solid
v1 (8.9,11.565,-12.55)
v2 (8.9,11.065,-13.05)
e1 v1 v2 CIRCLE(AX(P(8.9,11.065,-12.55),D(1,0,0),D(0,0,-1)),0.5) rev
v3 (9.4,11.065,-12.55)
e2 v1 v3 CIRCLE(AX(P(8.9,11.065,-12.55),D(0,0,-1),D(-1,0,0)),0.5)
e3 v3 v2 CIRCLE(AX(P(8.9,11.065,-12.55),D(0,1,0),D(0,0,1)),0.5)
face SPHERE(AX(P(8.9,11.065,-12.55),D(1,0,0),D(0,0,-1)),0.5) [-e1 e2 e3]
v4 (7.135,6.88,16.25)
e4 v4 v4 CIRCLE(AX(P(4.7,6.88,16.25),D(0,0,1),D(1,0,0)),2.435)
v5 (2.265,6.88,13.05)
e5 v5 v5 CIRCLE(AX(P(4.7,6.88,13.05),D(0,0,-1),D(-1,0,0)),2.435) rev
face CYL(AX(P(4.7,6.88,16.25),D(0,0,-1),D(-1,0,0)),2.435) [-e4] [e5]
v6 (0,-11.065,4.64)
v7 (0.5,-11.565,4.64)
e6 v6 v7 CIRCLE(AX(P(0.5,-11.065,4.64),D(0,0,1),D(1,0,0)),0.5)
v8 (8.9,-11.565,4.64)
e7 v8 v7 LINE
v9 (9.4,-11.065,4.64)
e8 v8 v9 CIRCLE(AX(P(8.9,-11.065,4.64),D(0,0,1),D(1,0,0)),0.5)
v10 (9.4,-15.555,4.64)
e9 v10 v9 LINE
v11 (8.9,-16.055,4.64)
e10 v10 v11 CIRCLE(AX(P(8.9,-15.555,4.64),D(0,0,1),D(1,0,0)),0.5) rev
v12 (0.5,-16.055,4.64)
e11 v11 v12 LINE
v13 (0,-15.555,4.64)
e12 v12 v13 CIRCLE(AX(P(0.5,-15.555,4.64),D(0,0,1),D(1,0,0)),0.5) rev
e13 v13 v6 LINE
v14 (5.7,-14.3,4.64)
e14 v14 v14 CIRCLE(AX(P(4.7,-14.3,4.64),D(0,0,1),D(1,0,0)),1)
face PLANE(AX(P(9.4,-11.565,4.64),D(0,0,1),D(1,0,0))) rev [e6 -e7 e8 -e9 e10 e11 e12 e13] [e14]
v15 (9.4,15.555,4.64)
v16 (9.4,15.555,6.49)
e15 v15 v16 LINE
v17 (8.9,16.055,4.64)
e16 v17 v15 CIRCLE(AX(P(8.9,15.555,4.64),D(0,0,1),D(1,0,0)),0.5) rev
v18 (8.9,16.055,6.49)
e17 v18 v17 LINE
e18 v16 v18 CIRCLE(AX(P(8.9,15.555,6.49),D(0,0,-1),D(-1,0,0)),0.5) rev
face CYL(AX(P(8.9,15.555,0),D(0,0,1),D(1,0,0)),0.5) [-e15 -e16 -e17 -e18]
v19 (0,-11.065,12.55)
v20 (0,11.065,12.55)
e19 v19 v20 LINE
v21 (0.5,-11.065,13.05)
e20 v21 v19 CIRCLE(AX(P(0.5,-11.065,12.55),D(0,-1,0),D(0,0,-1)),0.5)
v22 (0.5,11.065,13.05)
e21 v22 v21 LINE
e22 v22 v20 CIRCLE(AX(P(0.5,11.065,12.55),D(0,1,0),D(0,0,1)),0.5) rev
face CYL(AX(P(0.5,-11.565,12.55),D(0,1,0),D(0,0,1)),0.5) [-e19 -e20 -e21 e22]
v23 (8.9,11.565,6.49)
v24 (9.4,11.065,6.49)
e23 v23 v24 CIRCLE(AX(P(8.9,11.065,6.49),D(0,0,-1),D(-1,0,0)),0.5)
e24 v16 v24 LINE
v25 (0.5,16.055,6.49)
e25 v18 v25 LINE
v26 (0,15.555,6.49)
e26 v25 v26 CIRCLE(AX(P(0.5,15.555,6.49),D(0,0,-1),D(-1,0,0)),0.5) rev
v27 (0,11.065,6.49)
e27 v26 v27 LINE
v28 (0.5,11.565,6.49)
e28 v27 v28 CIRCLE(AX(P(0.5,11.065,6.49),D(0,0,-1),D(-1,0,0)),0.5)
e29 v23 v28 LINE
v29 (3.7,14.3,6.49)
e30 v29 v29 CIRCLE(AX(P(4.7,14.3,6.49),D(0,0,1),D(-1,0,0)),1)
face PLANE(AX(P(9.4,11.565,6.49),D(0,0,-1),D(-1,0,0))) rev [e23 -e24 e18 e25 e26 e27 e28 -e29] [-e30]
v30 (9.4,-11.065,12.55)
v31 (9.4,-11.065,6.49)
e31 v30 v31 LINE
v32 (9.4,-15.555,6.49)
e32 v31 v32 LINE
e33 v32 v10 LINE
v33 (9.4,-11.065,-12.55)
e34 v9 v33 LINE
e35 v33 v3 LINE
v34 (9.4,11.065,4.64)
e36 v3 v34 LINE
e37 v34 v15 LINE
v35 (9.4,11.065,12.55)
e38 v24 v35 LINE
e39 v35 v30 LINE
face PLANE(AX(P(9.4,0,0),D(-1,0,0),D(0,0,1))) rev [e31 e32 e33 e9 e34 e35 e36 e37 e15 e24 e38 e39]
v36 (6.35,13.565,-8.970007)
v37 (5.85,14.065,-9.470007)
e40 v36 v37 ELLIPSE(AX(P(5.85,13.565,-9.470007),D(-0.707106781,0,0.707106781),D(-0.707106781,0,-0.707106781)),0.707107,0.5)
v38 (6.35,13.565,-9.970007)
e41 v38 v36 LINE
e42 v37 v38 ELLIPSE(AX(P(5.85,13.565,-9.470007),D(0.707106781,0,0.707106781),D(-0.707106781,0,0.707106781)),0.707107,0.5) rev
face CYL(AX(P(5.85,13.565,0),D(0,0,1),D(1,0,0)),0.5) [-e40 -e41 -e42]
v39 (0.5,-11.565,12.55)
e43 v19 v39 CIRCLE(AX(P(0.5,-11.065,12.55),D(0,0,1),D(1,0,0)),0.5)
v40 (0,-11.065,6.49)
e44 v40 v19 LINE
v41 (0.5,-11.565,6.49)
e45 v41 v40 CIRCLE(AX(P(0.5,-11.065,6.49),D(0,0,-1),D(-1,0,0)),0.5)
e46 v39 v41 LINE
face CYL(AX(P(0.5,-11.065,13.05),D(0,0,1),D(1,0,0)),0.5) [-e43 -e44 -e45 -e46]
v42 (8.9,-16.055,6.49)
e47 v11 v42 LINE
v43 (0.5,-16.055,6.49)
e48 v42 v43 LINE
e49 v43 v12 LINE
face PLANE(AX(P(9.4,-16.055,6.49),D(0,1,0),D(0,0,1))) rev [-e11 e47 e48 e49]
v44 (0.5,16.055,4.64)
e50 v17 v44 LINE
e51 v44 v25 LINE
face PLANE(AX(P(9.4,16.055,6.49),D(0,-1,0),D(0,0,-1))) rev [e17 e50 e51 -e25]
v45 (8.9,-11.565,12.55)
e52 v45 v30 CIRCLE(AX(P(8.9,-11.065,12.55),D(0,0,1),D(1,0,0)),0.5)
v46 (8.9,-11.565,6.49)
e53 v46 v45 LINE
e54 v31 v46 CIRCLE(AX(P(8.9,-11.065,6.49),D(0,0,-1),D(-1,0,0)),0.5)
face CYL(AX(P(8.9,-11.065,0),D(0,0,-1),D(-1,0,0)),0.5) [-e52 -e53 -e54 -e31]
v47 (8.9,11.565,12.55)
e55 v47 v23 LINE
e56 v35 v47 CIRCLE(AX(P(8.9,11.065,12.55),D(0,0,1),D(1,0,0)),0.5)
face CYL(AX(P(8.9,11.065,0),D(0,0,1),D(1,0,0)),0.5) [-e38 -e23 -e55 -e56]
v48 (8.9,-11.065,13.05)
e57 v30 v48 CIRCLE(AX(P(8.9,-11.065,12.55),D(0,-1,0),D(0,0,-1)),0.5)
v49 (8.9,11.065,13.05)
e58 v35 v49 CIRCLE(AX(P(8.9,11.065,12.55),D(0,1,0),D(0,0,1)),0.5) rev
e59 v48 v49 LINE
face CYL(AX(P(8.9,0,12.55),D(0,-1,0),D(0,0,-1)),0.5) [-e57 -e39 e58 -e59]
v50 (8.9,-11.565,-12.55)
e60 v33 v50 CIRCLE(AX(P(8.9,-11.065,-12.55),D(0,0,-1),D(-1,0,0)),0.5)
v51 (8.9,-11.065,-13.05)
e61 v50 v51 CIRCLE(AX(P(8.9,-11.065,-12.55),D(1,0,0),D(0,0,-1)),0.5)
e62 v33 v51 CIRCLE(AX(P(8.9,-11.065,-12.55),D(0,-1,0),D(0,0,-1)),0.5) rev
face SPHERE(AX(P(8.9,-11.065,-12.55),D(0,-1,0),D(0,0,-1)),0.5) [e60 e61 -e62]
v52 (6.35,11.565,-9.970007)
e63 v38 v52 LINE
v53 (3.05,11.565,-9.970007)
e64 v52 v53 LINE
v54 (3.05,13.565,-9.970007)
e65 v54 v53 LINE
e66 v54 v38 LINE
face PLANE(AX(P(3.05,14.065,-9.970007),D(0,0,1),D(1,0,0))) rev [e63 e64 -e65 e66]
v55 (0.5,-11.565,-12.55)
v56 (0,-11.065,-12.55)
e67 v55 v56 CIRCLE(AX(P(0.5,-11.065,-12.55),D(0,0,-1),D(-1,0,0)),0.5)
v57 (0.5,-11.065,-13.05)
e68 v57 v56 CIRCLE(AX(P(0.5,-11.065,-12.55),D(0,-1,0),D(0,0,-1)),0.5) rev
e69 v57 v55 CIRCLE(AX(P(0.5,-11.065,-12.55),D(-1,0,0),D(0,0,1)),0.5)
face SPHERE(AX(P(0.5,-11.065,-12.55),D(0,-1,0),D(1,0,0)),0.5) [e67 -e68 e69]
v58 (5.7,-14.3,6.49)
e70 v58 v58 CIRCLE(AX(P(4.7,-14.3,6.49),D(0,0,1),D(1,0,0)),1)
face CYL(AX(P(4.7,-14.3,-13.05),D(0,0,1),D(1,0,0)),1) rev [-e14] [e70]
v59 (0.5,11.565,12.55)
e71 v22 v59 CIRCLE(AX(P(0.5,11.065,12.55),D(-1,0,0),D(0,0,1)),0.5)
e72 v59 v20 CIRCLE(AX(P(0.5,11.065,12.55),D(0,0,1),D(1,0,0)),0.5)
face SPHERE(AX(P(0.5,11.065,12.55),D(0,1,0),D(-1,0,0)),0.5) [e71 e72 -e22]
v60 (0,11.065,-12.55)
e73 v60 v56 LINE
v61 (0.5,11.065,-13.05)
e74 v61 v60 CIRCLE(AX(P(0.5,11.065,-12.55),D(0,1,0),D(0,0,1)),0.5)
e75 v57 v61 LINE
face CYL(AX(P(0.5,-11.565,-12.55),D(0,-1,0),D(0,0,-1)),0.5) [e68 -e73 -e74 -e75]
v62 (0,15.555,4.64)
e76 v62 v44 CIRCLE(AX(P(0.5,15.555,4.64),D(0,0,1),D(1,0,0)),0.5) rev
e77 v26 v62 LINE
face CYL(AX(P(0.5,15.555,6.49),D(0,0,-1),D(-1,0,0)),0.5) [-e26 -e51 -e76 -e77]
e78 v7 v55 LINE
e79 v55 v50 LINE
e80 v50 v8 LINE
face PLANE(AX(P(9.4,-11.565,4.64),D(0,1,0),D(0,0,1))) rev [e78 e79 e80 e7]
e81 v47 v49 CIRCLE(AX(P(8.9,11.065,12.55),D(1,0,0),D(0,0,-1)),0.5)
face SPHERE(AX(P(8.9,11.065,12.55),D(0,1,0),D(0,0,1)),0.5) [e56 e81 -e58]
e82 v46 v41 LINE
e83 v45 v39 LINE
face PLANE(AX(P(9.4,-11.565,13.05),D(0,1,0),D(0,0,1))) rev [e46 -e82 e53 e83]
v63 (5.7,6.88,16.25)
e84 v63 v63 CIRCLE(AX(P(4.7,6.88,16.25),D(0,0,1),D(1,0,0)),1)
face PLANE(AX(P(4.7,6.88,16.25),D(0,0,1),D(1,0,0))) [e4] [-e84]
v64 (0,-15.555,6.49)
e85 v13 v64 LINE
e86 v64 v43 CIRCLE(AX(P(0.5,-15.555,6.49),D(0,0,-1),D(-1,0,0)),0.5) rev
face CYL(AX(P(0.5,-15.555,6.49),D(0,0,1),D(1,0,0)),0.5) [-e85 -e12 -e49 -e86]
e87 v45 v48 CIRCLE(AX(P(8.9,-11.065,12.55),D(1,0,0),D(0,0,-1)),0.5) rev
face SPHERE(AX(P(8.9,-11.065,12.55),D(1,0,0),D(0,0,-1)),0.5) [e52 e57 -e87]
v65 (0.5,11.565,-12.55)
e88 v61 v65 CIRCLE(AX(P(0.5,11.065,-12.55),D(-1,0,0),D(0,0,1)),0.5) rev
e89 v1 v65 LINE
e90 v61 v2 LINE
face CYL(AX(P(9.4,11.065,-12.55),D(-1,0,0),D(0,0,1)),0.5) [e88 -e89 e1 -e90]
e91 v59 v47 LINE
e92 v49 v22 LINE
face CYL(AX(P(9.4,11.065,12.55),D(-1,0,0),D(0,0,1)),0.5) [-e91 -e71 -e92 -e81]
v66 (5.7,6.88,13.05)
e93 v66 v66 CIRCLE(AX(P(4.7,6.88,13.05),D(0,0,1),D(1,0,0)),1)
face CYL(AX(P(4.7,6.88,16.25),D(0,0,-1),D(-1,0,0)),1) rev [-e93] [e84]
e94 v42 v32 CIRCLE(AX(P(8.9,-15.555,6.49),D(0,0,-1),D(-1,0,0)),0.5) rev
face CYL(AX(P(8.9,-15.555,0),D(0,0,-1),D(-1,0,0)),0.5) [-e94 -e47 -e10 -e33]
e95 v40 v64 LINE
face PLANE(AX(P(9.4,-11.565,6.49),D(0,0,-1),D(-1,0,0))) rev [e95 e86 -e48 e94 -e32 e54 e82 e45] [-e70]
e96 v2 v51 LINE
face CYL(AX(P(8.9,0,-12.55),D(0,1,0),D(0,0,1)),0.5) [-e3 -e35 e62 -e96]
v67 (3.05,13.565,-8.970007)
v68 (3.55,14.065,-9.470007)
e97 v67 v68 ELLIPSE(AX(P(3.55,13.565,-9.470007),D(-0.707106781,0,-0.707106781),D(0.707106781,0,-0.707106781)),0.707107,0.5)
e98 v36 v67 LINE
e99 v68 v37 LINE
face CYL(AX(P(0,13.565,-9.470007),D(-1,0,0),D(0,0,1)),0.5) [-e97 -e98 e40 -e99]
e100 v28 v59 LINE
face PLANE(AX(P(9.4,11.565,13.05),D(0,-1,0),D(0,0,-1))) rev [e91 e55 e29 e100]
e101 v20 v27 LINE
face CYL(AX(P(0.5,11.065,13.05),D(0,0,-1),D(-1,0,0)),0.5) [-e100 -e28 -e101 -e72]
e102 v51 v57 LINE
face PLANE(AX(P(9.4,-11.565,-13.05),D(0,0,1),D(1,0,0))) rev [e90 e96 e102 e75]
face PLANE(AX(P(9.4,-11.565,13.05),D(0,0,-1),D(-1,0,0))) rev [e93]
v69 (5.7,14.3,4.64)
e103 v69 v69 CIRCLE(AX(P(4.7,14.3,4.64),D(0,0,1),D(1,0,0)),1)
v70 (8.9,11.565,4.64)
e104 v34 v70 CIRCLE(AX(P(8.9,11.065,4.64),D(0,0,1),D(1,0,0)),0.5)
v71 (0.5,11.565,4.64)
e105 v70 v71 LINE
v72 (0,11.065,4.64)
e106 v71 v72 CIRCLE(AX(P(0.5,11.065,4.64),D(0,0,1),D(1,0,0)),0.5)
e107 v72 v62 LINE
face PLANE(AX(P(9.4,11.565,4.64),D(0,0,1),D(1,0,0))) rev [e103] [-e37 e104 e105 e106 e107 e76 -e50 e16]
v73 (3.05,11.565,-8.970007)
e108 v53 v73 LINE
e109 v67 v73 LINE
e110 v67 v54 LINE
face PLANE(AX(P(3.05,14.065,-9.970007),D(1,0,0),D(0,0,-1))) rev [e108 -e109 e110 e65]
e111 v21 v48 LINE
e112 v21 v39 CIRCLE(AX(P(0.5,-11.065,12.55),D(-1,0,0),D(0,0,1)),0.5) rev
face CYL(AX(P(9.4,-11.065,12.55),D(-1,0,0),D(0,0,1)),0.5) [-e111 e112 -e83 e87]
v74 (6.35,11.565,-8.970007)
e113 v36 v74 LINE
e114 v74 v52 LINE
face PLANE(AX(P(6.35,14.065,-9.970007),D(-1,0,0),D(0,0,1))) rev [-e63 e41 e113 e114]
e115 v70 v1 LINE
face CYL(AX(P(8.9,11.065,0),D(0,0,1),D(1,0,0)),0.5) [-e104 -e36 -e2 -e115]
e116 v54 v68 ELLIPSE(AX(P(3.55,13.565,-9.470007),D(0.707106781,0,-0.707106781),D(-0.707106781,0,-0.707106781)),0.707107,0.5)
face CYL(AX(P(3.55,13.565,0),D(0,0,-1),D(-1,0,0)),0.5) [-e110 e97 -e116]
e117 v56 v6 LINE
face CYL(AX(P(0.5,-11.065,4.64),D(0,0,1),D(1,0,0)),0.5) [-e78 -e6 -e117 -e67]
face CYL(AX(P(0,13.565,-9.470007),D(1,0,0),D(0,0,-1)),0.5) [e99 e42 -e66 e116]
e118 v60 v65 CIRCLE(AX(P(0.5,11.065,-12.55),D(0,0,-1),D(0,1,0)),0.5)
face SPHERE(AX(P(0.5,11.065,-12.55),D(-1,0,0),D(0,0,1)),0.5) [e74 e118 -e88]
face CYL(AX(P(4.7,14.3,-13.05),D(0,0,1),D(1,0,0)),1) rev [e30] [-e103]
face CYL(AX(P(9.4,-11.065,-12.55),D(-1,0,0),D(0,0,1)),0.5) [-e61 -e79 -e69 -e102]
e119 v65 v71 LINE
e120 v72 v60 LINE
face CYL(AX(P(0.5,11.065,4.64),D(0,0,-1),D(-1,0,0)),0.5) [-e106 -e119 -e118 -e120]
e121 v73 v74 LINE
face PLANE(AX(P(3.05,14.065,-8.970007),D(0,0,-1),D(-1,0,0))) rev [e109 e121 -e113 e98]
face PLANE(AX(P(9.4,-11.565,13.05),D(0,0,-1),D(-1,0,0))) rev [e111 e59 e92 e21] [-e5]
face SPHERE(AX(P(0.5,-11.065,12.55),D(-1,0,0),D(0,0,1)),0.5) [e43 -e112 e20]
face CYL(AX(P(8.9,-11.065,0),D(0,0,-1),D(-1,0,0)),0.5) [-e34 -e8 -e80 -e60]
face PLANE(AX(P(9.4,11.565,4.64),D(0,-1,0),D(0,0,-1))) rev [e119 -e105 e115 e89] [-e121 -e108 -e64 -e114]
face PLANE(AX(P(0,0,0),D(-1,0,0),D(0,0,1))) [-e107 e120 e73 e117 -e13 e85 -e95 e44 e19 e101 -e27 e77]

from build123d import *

# Parameters (mm, degrees)
BOSS_EXTRUDE1_DEPTH = 9.4
FILLET1_R           = 0.5
FILLET2_R           = 0.5
SKETCH2_R           = 1
CUT_EXTRUDE1_DEPTH  = 27.98026362
SKETCH3_W           = 3.3
SKETCH3_H           = 1
BOSS_EXTRUDE2_DEPTH = 2.5
FILLET3_R           = 0.5
SKETCH4_R           = 2.435
SKETCH4_R_2         = 1
BOSS_EXTRUDE3_DEPTH = 3.2


with BuildPart() as part:
    # Sketch1 → Boss-Extrude1 (new body)
    with BuildSketch(Plane(origin=(0, 0, 0), x_dir=(0, 0, -1), z_dir=(1, 0, 0))):
        Polygon((-4.64, 11.565), (13.05, 11.565), (13.05, -11.565), (-4.64, -11.565), (-4.64, -16.055), (-6.49, -16.055), (-6.49, -11.565), (-13.05, -11.565), (-13.05, 11.565), (-6.49, 11.565), (-6.49, 16.055), (-4.64, 16.055), align=None)
    extrude(amount=BOSS_EXTRUDE1_DEPTH)

    # Fillet1
    fillet1_edges = [part.edges().sort_by_distance(p)[0] for p in [
        (0, -16.055, 5.565),
        (0, 16.055, 5.565),
        (9.4, 16.055, 5.565),
        (9.4, -16.055, 5.565),
    ]]
    fillet(fillet1_edges, radius=FILLET1_R)

    # Fillet2
    fillet2_edges = [part.edges().sort_by_distance(p)[0] for p in [
        (0, -11.565, -4.205),
        (0, -11.565, 9.77),
        (0, 0, 13.05),
        (0, 11.565, 9.77),
        (0, 11.565, -4.205),
        (0, 0, -13.05),
        (4.7, -11.565, -13.05),
        (4.7, -11.565, 13.05),
        (4.7, 11.565, 13.05),
        (4.7, 11.565, -13.05),
        (9.4, 11.565, 9.77),
        (9.4, 0, 13.05),
        (9.4, -11.565, 9.77),
        (9.4, -11.565, -4.205),
        (9.4, 0, -13.05),
        (9.4, 11.565, -4.205),
    ]]
    fillet(fillet2_edges, radius=FILLET2_R)

    # Sketch2 → Cut-Extrude1 (cut, through all)
    with BuildSketch(Plane.XY.offset(6.49)):
        with Locations((4.7, -14.3)):
            Circle(SKETCH2_R)
        with Locations((4.7, 14.3)):
            Circle(SKETCH2_R)
    extrude(amount=-CUT_EXTRUDE1_DEPTH, mode=Mode.SUBTRACT)

    # Sketch3 → Boss-Extrude2 (add)
    with BuildSketch(Plane(origin=(0, 11.565, 0), x_dir=(1, 0, 0), z_dir=(0, 1, 0))):
        with Locations((4.7, 9.470007)):
            Rectangle(SKETCH3_W, SKETCH3_H)
    extrude(amount=BOSS_EXTRUDE2_DEPTH)

    # Fillet3
    fillet3_edges = [part.edges().sort_by_distance(p)[0] for p in [
        (3.05, 14.065, -9.470007),
        (4.7, 14.065, -8.970007),
        (6.35, 14.065, -9.470007),
        (4.7, 14.065, -9.970007),
    ]]
    fillet(fillet3_edges, radius=FILLET3_R - 0.0001)  # a hair under: the kernel refuses the full size

    # Sketch4 → Boss-Extrude3 (add)
    with BuildSketch(Plane.XY.offset(13.05)):
        with Locations(Location((4.7, 6.88, 0), (0, 0, 180))):
            Circle(SKETCH4_R)
        with Locations((4.7, 6.88)):
            Circle(SKETCH4_R_2, mode=Mode.SUBTRACT)
    extrude(amount=BOSS_EXTRUDE3_DEPTH)


solid = part.part
